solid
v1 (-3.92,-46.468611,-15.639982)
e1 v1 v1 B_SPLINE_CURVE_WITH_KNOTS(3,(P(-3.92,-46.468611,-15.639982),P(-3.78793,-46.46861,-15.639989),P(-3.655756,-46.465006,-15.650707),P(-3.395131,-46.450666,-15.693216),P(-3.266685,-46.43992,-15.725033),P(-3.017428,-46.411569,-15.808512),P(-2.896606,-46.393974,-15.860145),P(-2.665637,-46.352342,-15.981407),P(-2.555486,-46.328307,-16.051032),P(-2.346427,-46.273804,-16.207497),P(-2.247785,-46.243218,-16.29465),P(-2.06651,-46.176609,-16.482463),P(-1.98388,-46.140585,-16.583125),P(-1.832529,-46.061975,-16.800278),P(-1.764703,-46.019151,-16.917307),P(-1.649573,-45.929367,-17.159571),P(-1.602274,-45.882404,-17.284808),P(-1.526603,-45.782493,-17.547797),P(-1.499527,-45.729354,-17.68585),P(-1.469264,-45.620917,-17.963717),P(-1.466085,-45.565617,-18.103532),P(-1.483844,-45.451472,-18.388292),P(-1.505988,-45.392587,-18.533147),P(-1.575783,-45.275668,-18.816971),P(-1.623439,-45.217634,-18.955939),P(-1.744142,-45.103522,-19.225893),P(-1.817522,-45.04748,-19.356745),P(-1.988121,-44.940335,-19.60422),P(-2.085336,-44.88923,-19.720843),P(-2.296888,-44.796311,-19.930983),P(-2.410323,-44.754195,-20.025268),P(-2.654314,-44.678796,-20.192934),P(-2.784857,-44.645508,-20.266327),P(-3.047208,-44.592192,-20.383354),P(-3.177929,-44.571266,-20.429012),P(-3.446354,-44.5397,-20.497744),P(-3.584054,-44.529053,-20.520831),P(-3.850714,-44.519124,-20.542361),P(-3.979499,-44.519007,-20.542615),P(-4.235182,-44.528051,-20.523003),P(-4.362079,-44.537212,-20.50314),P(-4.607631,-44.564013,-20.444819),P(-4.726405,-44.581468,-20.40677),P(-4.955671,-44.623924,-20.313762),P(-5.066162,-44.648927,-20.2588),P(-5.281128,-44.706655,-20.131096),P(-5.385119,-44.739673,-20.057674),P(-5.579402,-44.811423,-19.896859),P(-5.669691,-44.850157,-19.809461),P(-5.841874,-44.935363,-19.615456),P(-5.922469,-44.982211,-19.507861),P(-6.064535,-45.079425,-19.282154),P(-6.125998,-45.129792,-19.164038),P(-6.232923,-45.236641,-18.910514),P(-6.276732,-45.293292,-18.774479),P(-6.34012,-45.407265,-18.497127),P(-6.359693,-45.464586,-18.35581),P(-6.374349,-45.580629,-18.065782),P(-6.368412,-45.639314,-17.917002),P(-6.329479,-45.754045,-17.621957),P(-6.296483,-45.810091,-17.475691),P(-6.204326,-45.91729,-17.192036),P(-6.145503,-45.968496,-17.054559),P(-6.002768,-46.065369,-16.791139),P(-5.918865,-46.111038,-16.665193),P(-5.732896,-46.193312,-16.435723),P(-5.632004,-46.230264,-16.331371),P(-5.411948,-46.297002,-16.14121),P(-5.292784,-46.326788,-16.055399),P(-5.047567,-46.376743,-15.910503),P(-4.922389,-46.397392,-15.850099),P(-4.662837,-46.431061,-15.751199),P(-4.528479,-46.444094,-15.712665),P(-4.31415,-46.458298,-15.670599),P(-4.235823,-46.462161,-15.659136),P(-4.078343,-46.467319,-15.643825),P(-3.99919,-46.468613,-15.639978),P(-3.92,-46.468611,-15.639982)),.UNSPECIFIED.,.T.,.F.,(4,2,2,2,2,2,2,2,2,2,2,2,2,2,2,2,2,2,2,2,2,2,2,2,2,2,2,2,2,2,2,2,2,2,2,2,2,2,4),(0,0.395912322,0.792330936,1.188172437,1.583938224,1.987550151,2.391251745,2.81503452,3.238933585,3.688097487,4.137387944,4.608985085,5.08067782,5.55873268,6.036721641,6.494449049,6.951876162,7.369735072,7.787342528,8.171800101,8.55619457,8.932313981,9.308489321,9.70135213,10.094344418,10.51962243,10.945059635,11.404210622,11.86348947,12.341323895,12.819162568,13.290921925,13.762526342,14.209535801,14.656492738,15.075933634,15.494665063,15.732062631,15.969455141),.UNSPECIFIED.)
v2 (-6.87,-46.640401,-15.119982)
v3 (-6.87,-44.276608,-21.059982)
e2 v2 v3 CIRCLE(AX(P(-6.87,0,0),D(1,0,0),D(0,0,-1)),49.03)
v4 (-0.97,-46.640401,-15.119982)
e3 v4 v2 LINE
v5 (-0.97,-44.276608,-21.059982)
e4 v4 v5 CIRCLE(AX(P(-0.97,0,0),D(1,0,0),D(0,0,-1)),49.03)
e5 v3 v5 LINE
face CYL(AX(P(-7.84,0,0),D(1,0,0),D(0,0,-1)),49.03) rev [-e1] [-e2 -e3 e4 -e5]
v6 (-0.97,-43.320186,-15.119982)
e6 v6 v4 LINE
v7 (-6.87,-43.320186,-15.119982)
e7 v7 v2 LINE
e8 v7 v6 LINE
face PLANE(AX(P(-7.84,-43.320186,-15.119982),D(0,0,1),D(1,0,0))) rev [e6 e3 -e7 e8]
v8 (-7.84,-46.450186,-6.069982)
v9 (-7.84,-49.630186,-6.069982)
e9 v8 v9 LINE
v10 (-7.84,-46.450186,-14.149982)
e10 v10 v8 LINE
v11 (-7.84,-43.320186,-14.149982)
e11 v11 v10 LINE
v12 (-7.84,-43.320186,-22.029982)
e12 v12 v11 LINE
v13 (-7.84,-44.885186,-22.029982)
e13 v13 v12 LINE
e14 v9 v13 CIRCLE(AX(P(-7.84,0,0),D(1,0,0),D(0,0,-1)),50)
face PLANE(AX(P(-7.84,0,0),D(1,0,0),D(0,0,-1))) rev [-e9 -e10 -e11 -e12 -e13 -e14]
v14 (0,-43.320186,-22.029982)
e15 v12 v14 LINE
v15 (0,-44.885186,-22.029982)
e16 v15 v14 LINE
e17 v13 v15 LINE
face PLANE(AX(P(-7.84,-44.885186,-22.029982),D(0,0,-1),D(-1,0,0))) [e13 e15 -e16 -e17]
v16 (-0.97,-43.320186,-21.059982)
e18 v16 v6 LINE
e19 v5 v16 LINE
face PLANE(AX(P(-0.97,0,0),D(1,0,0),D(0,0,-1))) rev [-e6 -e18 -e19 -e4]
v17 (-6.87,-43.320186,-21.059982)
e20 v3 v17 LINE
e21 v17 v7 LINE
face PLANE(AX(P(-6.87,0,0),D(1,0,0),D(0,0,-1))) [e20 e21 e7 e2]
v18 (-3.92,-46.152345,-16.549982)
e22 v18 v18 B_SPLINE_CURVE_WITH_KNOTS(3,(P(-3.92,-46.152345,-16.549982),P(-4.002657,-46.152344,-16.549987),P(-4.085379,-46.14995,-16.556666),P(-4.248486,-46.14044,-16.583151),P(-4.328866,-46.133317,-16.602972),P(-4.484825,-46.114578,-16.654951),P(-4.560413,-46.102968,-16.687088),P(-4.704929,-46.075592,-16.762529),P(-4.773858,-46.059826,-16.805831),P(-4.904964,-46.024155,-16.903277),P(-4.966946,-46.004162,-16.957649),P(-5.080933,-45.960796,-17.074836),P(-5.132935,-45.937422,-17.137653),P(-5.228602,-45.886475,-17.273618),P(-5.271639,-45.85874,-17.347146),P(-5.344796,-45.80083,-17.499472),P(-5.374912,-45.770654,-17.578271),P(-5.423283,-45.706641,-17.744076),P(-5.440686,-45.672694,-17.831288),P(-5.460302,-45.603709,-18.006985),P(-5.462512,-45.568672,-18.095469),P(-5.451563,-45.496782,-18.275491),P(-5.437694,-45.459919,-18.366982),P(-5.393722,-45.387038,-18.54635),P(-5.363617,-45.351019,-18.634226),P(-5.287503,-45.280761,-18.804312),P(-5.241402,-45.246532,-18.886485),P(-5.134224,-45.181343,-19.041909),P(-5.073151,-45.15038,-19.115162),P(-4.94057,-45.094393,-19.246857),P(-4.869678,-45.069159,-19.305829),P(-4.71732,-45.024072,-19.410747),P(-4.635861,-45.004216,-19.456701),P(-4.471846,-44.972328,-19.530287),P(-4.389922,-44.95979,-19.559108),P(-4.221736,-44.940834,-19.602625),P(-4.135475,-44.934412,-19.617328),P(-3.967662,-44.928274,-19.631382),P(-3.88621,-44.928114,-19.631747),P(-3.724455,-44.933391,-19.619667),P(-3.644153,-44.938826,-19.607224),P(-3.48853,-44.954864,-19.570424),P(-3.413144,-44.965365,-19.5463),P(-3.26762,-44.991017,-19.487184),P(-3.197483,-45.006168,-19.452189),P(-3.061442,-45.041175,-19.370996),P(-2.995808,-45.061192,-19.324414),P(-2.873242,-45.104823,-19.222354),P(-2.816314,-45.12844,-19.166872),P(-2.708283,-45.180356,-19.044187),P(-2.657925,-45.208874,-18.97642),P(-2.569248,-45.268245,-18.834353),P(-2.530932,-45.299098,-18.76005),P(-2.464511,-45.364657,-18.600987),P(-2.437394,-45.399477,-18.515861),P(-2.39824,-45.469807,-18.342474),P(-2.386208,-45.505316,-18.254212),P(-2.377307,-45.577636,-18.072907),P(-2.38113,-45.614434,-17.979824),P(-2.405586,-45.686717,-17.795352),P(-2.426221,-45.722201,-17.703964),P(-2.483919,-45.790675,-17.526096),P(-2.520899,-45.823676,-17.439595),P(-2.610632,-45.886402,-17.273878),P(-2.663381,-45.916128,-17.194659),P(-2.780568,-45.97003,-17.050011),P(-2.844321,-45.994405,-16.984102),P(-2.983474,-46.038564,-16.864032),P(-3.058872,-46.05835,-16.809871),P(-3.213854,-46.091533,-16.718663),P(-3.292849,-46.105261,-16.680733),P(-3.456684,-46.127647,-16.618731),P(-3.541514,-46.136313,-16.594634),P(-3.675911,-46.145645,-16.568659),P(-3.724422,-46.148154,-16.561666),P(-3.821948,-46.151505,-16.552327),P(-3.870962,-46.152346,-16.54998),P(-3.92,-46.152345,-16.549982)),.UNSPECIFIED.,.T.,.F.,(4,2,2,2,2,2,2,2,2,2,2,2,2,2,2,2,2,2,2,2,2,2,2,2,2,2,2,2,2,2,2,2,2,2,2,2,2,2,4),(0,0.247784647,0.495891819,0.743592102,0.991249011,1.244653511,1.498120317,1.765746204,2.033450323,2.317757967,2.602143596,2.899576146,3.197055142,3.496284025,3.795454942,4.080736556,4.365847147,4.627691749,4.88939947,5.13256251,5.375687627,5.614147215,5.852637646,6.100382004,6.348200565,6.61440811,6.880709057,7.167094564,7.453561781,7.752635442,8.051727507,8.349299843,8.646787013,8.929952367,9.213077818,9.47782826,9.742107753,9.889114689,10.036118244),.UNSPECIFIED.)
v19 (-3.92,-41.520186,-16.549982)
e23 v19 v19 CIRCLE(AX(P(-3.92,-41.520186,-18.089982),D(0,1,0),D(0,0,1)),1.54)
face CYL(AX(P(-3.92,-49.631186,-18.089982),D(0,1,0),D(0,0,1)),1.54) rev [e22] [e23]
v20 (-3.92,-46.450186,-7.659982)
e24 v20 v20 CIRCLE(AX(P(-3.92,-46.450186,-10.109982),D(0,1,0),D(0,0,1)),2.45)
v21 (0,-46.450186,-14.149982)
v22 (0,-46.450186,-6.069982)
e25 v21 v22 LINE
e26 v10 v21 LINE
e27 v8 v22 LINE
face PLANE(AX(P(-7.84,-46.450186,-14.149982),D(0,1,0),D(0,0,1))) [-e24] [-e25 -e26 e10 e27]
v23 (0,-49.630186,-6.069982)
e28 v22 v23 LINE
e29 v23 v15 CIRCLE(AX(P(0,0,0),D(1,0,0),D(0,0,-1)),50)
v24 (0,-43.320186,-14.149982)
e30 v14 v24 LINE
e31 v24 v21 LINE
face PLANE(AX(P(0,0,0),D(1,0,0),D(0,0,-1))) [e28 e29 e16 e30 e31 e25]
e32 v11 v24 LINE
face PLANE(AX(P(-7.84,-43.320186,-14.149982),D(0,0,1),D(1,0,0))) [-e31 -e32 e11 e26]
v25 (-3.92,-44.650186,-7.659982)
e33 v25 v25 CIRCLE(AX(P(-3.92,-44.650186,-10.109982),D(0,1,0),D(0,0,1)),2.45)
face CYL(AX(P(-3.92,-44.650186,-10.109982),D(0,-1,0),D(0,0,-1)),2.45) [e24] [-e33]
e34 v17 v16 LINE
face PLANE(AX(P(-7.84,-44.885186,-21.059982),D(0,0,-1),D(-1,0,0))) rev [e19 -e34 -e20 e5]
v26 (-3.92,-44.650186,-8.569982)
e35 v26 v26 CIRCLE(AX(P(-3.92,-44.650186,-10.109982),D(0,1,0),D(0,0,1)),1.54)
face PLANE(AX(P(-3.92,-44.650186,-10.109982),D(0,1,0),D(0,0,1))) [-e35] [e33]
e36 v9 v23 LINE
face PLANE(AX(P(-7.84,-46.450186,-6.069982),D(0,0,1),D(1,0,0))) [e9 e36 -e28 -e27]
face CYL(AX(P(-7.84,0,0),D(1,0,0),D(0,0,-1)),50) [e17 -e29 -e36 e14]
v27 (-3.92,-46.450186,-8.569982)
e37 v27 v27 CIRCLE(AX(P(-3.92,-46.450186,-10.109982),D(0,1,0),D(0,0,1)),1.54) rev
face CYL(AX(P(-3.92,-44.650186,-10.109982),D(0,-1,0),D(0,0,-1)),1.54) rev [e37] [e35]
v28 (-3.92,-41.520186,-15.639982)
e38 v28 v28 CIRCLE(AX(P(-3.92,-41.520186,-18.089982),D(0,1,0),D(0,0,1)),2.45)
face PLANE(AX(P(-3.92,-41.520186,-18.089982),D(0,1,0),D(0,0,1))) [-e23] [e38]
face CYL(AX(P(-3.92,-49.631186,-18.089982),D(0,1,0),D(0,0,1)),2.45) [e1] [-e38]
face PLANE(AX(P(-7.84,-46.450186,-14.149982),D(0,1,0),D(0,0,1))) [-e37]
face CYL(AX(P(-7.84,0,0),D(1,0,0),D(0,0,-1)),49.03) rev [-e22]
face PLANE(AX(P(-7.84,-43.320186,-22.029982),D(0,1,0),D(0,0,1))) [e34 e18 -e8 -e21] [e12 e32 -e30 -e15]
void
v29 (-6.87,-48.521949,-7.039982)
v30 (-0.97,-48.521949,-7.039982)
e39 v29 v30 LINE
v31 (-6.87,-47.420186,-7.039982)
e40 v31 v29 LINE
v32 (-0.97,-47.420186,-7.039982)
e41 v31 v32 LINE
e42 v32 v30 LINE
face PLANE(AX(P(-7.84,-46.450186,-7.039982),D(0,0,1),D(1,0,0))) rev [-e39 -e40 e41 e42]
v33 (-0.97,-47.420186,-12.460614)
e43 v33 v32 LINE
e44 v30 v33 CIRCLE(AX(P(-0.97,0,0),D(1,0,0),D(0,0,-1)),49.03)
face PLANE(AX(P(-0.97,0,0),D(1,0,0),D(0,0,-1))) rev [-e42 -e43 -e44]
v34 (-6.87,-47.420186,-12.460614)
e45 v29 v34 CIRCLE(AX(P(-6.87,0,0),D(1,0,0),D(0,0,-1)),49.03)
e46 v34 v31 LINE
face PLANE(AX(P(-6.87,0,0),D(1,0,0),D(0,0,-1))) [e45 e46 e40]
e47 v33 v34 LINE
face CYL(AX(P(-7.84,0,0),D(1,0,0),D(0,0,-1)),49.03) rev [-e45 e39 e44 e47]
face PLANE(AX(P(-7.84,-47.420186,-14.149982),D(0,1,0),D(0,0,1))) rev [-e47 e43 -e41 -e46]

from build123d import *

# Parameters (mm, degrees)
BOSS_EXTRUDE1_DEPTH      = 7.84
SHELL1_START             = -6.87
SHELL1_DEPTH             = 5.9
BOSS_EXTRUDE2_REACH      = 26.75
BOSS_EXTRUDE2_END_RADIUS = 49.03
SKETCH2_R                = 2.45
SKETCH2_R_2              = 1.54
SKETCH3_R                = 2.45
SKETCH3_R_2              = 1.54
BOSS_EXTRUDE3_DEPTH      = 1.8


# Read off the part's stored shape, not the designer's step: Shell1
with BuildPart() as part:
    # Sketch1 → Boss-Extrude1 (new body)
    with BuildSketch(Plane(origin=(0, 0, 0), x_dir=(0, 0, -1), z_dir=(1, 0, 0))):
        with BuildLine():
            Line((22.029982318, -44.885185519), (22.029982318, -43.320185519))
            Line((22.029982318, -43.320185519), (14.149982318, -43.320185519))
            Line((14.149982318, -43.320185519), (14.149982318, -46.450185519))
            Line((14.149982318, -46.450185519), (6.069982318, -46.450185519))
            Line((6.069982318, -46.450185519), (6.069982318, -49.630185519))
            ThreePointArc((6.069982318, -49.630185519), (14.24888625, -47.926706966), (22.029982318, -44.885185519))
        make_face()
    extrude(amount=-BOSS_EXTRUDE1_DEPTH)

    # Shell1 outline → Shell1 (cut)
    with BuildSketch(Plane.YZ.offset(SHELL1_START)):
        with BuildLine():
            Line((-43.320185519, -15.119982318), (-46.640401314, -15.119982318))
            ThreePointArc((-46.640401314, -15.119982318), (-45.555422953, -18.128550399), (-44.276608325, -21.059982318))
            Line((-44.276608325, -21.059982318), (-43.320185519, -21.059982318))
            Line((-43.320185519, -21.059982318), (-43.320185519, -15.119982318))
        make_face()
        with BuildLine():
            Line((-47.420185519, -7.039982318), (-48.521949146, -7.039982318))
            ThreePointArc((-48.521949146, -7.039982318), (-48.047571358, -9.765847969), (-47.420185519, -12.460614163))
            Line((-47.420185519, -12.460614163), (-47.420185519, -7.039982318))
        make_face()
    extrude(amount=SHELL1_DEPTH, mode=Mode.SUBTRACT)

    # Boss-Extrude2: up to this cylinder (the profile starts inside it)
    boss_extrude2_end = Plane(origin=(-3.92, 0, 0), z_dir=(1, 0, 0)) * Cylinder(BOSS_EXTRUDE2_END_RADIUS, 152.56, mode=Mode.PRIVATE)
    # Sketch2 → Boss-Extrude2 (add, up to the surface)
    with BuildSketch(Plane(origin=(0, -41.520185519, 0), x_dir=(1, 0, 0), z_dir=(0, 1, 0)), mode=Mode.PRIVATE) as boss_extrude2_sk1:
        with Locations(Location((-3.92, 18.089982318, 0), (0, 0, 270))):
            Circle(SKETCH2_R)
        with Locations(Location((-3.92, 18.089982318, 0), (0, 0, 270))):
            Circle(SKETCH2_R_2, mode=Mode.SUBTRACT)
    boss_extrude2_tool1 = extrude(boss_extrude2_sk1.sketch, amount=-BOSS_EXTRUDE2_REACH, mode=Mode.PRIVATE) & boss_extrude2_end
    add(boss_extrude2_tool1.solids().sort_by_distance((-3.92, -41.520186, -20.470686))[0])

    # Sketch3 → Boss-Extrude3 (add)
    with BuildSketch(Plane(origin=(0, -46.450185519, 0), x_dir=(1, 0, 0), z_dir=(0, 1, 0))):
        with Locations(Location((-3.92, 10.109982318, 0), (0, 0, 270))):
            Circle(SKETCH3_R)
        with Locations(Location((-3.92, 10.109982318, 0), (0, 0, 270))):
            Circle(SKETCH3_R_2, mode=Mode.SUBTRACT)
    extrude(amount=BOSS_EXTRUDE3_DEPTH)


solid = part.part
